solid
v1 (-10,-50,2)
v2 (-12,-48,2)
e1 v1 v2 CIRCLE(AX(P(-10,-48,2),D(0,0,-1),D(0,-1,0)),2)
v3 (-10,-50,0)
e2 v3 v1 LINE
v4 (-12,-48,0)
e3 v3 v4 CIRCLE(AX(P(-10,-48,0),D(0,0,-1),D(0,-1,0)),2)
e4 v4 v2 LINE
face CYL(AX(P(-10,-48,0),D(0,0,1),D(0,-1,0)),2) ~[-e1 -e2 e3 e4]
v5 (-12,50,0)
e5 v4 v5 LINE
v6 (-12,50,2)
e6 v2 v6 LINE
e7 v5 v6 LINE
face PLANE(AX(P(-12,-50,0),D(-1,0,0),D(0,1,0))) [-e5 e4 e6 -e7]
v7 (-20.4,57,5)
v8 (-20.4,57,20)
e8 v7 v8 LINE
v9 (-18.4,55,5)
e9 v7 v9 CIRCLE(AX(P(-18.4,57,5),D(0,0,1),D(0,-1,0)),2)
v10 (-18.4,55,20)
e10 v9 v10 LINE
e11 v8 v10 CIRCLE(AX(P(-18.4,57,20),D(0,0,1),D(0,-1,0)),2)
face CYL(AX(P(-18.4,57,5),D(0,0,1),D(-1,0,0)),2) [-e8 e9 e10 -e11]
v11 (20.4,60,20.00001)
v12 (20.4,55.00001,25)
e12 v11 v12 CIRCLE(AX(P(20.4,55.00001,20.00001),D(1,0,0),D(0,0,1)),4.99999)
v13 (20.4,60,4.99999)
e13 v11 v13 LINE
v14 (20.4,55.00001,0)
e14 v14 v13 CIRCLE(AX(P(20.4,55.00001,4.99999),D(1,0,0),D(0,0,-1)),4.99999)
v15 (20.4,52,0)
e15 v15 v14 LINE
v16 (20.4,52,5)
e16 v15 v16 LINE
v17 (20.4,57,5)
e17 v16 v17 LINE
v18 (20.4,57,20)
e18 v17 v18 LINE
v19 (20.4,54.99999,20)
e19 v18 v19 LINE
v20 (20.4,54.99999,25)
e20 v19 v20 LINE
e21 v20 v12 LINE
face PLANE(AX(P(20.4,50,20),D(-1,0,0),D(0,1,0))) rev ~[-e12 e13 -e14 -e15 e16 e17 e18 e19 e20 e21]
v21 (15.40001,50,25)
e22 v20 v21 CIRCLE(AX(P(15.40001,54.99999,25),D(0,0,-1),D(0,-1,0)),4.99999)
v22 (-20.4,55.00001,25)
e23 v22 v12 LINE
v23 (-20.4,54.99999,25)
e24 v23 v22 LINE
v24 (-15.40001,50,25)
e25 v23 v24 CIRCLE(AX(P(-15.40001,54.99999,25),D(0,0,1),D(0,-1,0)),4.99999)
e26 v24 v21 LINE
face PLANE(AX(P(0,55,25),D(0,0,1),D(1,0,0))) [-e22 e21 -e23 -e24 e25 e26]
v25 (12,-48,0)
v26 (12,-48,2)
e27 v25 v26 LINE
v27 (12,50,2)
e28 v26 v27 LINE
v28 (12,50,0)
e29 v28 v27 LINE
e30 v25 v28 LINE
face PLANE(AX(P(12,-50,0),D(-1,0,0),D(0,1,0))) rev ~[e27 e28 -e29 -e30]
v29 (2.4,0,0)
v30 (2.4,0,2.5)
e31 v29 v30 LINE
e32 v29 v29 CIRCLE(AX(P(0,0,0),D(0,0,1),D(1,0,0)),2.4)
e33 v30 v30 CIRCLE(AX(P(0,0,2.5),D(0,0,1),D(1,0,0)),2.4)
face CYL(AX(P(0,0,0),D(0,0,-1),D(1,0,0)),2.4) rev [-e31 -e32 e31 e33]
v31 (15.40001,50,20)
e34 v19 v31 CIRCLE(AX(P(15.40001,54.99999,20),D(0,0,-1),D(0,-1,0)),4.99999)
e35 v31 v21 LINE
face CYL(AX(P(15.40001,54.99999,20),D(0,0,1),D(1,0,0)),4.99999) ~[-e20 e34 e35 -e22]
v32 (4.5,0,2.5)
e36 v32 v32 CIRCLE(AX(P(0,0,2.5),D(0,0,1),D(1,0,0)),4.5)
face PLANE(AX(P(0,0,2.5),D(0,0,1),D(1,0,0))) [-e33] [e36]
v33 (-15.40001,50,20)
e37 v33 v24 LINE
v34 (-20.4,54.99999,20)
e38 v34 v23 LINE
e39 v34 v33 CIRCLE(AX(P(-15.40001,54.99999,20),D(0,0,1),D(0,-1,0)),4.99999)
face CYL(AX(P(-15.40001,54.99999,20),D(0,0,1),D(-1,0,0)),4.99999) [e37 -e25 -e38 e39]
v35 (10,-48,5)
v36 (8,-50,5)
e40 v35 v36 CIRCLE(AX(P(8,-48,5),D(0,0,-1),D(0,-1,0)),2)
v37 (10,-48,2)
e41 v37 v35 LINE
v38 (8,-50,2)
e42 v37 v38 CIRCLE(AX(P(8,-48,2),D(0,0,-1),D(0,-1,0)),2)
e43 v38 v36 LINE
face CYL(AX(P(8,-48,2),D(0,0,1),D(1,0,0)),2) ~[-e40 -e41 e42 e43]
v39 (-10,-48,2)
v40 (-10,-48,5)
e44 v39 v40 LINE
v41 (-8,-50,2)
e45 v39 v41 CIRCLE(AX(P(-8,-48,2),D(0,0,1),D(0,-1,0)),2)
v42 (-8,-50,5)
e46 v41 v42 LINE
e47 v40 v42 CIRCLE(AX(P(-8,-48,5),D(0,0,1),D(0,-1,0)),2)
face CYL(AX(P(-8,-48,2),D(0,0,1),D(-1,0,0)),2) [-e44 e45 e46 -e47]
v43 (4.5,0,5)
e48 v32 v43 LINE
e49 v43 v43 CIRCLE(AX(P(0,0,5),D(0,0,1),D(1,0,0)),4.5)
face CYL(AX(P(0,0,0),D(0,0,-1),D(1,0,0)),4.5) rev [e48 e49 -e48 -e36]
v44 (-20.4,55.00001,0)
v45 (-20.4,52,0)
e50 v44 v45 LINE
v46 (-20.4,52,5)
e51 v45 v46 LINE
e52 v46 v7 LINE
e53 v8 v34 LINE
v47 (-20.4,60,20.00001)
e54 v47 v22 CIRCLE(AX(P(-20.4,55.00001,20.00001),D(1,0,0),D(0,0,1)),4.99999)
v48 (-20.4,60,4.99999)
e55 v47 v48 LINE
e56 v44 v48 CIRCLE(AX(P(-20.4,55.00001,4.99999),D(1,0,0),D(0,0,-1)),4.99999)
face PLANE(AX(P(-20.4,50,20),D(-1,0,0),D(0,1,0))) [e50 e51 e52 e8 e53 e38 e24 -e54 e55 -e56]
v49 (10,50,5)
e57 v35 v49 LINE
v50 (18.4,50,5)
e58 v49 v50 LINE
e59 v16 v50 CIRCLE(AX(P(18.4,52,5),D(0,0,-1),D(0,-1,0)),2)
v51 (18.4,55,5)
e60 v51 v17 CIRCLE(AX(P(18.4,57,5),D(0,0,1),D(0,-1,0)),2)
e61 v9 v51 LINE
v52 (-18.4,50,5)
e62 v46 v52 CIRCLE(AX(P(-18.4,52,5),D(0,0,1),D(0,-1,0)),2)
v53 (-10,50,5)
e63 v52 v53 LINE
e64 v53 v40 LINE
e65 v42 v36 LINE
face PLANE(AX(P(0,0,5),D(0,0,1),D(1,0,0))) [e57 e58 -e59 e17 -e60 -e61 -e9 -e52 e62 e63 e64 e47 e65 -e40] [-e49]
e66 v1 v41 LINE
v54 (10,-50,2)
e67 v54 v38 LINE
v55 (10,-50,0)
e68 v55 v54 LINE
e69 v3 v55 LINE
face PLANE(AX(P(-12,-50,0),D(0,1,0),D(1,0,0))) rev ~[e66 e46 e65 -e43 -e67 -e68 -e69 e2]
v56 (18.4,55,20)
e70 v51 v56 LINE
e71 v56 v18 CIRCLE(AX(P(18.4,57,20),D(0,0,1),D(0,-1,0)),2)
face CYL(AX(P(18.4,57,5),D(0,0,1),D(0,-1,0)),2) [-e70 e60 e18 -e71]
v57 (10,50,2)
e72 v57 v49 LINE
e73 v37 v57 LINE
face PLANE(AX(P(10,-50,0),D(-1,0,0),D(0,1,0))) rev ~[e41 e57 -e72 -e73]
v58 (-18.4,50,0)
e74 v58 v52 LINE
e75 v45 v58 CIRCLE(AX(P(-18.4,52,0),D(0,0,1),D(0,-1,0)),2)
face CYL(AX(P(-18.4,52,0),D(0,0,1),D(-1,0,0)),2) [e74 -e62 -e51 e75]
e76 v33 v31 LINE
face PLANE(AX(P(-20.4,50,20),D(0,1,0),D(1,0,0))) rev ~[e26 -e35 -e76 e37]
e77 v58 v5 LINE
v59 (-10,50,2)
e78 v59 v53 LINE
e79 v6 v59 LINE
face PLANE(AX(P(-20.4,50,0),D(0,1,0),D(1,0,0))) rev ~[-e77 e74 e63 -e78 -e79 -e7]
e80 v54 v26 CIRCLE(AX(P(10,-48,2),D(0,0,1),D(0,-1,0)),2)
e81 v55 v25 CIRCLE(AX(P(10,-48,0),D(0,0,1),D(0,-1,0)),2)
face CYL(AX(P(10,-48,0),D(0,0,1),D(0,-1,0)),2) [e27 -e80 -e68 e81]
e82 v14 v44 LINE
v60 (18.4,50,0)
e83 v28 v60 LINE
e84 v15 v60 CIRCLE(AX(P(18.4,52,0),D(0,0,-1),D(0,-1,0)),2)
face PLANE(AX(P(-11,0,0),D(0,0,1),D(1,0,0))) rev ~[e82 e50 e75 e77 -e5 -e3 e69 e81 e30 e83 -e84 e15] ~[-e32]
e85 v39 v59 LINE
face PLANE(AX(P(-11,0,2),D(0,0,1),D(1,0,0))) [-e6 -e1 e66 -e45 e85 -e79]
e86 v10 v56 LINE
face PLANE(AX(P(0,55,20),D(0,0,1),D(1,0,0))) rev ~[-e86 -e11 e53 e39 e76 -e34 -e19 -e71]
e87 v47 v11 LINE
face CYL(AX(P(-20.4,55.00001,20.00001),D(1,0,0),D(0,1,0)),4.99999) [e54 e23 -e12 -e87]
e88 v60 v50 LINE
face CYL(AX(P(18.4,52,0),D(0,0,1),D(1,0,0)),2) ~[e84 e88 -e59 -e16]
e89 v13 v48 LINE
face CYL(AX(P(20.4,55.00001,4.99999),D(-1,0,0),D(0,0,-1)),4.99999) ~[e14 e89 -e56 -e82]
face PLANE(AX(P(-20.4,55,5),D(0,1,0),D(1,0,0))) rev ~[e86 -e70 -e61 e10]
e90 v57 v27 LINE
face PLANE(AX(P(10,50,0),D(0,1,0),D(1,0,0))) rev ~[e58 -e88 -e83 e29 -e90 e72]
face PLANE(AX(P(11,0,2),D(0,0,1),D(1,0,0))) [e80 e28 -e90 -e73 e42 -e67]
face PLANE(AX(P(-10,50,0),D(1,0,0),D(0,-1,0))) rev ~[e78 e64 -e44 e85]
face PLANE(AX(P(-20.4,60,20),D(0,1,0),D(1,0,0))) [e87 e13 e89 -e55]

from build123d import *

# Parameters (mm, degrees)
F0_R     = 4.5
F0_R_2   = 2.4
F1_DEPTH = 2.5
F2_DEPTH = 5
F0_W     = 2
F0_H     = 100
F3_DEPTH = 2
F4_W     = 40.8
F4_H     = 5
F5_DEPTH = 15
F6_W     = 40.8
F6_H     = 10
F7_DEPTH = 5
F8_R     = 4.99999
F9_R     = 2


# Not quite as in the source:
# - a fillet or chamfer is up to 0.001 mm smaller than in the source, because OpenCascade refuses the exact size


with BuildPart() as f1:
    # F0 (on Top) → F1 (new body)
    with BuildSketch(Plane.XY):
        Circle(F0_R)
        Circle(F0_R_2, mode=Mode.SUBTRACT)
    extrude(amount=F1_DEPTH)

    # F0 (on Top) → F2 (join)
    with BuildSketch(Plane.XY):
        Polygon((-10, -50), (10, -50), (10, 50), (0, 50), (-10, 50), align=None)
        Circle(F0_R, mode=Mode.SUBTRACT)
        Polygon((0, 50), (10, 50), (12, 50), (20.4, 50), (20.4, 60), (-20.4, 60), (-20.4, 50), (-12, 50), (-10, 50), align=None)
    extrude(amount=F2_DEPTH)

    # F0 (on Top) → F3 (join)
    with BuildSketch(Plane.XY):
        with Locations((-11, 0)):
            Rectangle(F0_W, F0_H)
        with Locations((11, 0)):
            Rectangle(F0_W, F0_H)
    extrude(amount=F3_DEPTH)

    # F4 (on face) → F5 (join)
    with BuildSketch(Plane.XY.offset(5)):
        with Locations((0, 57.5)):
            Rectangle(F4_W, F4_H)
    extrude(amount=F5_DEPTH)

    # F6 (on face) → F7 (join)
    with BuildSketch(Plane.XY.offset(20)):
        with Locations((0, 55)):
            Rectangle(F6_W, F6_H)
    extrude(amount=F7_DEPTH)

    # F8 (radius 5 in the source; OpenCascade refuses exactly that, so slightly less here)
    f8_edges = [f1.edges().sort_by_distance(p)[0] for p in [
        (-20.4, 50, 22.5),
        (20.4, 50, 22.5),
        (0, 60, 25),
        (0, 60, 0),
    ]]
    fillet(f8_edges, radius=F8_R)

    # F9
    f9_edges = [f1.edges().sort_by_distance(p)[0] for p in [
        (-20.4, 55, 12.5),
        (20.4, 55, 12.5),
        (-12, -50, 1),
        (12, -50, 1),
        (-10, -50, 3.5),
        (10, -50, 3.5),
        (-20.4, 50, 2.5),
        (20.4, 50, 2.5),
    ]]
    fillet(f9_edges, radius=F9_R)


solid = f1.part
